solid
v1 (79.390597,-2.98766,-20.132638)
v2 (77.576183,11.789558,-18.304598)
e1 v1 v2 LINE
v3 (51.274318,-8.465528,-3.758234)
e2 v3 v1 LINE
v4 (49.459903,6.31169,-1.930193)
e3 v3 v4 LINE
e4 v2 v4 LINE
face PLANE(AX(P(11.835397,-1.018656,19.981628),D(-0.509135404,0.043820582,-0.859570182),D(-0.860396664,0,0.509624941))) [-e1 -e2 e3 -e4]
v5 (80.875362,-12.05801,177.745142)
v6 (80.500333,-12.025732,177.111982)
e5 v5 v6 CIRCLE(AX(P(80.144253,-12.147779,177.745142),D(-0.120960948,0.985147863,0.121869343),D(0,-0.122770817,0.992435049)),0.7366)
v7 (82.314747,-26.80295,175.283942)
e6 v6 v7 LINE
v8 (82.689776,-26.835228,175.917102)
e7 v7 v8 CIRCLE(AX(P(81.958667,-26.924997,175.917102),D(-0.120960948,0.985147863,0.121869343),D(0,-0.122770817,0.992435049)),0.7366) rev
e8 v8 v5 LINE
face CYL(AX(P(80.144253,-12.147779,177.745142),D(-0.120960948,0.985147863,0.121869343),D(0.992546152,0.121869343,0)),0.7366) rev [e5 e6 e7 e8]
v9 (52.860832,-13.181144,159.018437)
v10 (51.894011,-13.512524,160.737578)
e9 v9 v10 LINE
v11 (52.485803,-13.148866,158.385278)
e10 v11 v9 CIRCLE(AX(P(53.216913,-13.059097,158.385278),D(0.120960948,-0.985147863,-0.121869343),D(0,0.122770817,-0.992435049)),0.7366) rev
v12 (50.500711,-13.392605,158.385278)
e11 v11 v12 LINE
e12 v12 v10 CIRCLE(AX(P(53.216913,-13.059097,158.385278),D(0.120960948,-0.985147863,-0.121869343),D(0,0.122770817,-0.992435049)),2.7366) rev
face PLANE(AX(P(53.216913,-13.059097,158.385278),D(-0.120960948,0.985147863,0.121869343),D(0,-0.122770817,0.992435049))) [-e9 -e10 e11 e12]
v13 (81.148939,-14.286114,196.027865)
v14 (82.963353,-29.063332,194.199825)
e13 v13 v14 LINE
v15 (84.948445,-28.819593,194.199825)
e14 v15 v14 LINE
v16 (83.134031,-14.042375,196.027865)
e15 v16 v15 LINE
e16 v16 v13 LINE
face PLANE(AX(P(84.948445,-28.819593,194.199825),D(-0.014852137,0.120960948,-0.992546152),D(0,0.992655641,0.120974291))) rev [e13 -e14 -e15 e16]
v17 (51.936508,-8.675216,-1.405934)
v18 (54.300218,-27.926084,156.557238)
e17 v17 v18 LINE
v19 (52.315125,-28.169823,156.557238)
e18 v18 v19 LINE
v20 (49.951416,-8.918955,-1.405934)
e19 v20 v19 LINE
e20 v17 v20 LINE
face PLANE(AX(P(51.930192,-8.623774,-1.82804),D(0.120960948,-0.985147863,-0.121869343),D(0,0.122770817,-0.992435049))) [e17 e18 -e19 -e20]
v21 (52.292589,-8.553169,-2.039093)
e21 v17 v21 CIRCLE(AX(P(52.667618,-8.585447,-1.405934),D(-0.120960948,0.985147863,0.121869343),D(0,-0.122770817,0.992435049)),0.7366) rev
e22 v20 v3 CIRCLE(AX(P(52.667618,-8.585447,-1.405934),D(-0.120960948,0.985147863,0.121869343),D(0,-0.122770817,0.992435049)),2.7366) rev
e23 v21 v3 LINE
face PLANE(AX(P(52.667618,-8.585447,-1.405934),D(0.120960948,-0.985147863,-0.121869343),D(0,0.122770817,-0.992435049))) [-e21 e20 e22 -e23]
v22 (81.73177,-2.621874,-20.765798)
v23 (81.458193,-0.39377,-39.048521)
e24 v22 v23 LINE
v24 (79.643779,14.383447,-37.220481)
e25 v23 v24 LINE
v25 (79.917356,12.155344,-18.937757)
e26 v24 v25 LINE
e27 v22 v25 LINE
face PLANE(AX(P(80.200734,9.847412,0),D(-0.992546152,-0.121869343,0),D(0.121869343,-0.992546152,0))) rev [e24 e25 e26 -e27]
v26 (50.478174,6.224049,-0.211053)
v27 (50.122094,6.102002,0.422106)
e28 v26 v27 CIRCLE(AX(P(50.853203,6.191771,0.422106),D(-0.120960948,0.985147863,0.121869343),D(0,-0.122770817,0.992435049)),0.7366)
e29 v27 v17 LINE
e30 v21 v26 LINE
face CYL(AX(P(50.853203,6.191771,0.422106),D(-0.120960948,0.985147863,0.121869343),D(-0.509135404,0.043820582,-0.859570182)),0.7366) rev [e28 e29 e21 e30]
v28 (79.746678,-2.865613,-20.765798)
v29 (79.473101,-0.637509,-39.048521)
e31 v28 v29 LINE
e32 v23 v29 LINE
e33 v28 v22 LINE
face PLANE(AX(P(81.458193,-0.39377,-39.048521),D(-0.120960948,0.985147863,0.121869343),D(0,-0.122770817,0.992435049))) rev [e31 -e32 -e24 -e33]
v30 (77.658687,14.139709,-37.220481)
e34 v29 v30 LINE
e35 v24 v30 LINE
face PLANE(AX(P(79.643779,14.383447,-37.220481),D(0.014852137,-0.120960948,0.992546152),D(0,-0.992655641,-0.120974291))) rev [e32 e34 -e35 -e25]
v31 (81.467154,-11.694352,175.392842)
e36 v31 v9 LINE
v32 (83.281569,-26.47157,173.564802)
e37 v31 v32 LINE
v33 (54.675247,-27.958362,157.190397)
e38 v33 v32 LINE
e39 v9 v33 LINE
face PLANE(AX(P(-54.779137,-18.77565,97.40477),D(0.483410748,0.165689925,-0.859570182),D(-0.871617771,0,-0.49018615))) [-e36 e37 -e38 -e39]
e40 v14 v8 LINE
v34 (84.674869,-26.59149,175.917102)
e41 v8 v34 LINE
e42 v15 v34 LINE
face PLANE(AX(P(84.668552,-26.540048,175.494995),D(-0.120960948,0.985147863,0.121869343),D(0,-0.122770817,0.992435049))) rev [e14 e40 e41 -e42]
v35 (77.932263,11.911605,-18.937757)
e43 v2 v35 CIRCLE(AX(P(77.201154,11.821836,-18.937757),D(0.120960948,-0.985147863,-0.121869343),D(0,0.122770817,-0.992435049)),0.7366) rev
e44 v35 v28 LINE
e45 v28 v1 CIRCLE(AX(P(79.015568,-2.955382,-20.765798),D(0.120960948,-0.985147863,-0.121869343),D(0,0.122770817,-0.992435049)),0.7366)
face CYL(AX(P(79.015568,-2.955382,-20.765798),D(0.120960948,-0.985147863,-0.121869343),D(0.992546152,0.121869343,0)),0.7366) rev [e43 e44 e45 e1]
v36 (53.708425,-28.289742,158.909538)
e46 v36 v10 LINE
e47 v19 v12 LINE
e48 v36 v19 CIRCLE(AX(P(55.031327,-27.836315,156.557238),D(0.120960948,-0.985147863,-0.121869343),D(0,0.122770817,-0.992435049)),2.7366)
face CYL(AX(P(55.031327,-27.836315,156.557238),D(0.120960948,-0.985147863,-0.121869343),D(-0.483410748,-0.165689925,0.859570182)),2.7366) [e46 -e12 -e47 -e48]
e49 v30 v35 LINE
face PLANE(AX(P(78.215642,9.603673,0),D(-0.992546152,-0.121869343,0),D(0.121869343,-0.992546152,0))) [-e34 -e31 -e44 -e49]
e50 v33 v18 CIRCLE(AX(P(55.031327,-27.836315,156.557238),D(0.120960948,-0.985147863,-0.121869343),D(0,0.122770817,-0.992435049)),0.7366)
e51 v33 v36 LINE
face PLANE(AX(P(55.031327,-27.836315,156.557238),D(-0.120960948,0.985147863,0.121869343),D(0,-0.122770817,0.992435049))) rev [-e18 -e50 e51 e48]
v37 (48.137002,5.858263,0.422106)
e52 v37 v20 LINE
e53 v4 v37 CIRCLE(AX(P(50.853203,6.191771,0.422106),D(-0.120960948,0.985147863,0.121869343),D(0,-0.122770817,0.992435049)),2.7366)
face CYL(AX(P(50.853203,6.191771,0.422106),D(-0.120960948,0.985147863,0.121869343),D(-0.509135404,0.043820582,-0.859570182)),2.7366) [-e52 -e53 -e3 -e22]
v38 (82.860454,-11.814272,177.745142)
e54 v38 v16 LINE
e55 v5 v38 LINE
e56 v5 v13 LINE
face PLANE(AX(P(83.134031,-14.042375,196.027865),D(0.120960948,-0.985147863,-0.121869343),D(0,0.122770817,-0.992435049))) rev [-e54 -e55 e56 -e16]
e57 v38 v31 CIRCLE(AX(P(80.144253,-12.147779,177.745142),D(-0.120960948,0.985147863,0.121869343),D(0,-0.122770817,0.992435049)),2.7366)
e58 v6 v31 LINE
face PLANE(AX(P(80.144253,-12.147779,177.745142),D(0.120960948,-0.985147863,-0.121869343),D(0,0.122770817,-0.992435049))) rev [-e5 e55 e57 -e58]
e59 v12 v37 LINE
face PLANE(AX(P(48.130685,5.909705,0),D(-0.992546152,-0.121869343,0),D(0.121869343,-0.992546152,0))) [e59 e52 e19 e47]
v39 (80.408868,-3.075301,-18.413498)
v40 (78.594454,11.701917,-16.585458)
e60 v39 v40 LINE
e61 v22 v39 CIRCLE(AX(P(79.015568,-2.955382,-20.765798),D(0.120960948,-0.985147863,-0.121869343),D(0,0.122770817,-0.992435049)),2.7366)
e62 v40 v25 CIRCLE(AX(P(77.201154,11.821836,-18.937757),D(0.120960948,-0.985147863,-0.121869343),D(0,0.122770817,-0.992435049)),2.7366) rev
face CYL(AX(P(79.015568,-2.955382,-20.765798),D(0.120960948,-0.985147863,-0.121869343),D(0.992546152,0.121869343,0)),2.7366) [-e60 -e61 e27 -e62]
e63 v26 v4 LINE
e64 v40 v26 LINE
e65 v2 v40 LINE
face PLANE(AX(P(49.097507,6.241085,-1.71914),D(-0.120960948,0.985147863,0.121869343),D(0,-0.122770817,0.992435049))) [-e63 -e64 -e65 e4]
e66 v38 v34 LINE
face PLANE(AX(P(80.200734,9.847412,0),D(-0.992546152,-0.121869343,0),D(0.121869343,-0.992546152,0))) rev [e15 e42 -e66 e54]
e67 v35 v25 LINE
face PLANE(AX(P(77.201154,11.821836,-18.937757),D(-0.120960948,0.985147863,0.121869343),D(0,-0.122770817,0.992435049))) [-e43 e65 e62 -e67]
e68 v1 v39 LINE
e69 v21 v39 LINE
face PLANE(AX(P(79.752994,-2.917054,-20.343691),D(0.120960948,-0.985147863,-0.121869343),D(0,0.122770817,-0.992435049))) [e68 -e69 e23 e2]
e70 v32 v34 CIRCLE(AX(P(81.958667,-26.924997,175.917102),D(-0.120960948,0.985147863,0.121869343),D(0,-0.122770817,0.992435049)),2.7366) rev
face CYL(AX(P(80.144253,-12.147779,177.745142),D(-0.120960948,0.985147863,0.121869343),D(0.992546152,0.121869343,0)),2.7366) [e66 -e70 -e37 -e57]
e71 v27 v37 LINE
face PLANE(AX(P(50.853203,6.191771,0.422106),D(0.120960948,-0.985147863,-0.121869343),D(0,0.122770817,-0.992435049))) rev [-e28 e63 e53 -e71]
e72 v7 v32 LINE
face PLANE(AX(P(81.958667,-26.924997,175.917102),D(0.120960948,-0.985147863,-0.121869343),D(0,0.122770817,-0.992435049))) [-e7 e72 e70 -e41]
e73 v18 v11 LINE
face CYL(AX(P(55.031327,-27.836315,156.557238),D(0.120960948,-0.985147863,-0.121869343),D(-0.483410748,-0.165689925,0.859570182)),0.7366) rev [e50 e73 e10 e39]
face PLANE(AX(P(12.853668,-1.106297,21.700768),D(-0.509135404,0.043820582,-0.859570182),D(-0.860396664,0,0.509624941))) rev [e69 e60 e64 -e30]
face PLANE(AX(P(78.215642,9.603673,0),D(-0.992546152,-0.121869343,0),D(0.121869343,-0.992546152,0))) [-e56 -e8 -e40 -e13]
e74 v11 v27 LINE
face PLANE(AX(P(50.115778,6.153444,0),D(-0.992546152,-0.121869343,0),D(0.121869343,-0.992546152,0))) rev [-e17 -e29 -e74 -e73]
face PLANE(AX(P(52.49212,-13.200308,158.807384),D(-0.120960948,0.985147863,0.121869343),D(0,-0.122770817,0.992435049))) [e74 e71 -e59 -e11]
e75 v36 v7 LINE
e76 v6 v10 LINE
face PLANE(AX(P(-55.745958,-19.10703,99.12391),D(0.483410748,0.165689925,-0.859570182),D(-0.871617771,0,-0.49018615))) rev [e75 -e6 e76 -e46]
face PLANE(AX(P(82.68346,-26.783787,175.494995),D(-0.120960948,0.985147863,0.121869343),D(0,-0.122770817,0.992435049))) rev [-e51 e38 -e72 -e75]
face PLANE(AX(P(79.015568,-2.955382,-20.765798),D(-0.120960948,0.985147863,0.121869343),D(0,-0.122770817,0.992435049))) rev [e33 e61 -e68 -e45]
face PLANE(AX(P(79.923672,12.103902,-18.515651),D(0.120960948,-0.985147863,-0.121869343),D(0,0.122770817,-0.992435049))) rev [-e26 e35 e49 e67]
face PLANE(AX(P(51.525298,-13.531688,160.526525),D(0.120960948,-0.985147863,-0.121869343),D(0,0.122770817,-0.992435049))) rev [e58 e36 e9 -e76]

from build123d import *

# Parameters (mm, degrees)
SKETCH2_W                    = 160
SKETCH2_H                    = 15
BASE_FLANGE1_DEPTH           = 2
EDGE_FLANGE1_STRIP_CUT_DEPTH = 15
EDGE_FLANGE1_DEPTH           = 15
EDGE_FLANGE2_STRIP_CUT_DEPTH = 15
EDGE_FLANGE2_DEPTH           = 15
EDGE_FLANGE3_STRIP_CUT_DEPTH = 15
EDGE_FLANGE3_DEPTH           = 15
EDGE_FLANGE4_STRIP_CUT_DEPTH = 15
EDGE_FLANGE4_DEPTH           = 15


# Sheet-metal steps are written as plain solids
with BuildPart() as part:
    # Sketch2 → Base-Flange1 (new body)
    with BuildSketch(Plane(origin=(48.130685362, 5.909705068, 0), x_dir=(0.014852136862004454, -0.1209609477998444, 0.9925461516413208), z_dir=(-0.9925461516413208, -0.12186934340515826, 0))):
        with Locations((80, -7.5)):
            Rectangle(SKETCH2_W, SKETCH2_H)
    extrude(amount=-BASE_FLANGE1_DEPTH)

    # Edge-Flange1 strip (across the edge) → Edge-Flange1 strip cut (cut)
    with BuildSketch(Plane(origin=(51.930191883, -8.623774192, -1.828040151), x_dir=(0.5091354036436435, -0.04382058195792874, 0.8595701817498632), z_dir=(-0.1209609477998443, 0.9851478631379957, 0.1218693434051582))):
        Polygon((-8.835731855, 2.791911088), (-0.6317, -1.944688912), (0.3683, -0.212638104), (-7.835731855, 4.523961896), align=None)
    extrude(amount=EDGE_FLANGE1_STRIP_CUT_DEPTH, mode=Mode.SUBTRACT)

    # Edge-Flange1 section (across the edge) → Edge-Flange1 (add)
    with BuildSketch(Plane(origin=(51.930191883, -8.623774192, -1.828040151), x_dir=(0.5091354036436435, -0.04382058195792874, 0.8595701817498632), z_dir=(-0.1209609477998443, 0.9851478631379957, 0.1218693434051582))):
        with BuildLine():
            Line((-2, 0.425276208), (-2, 33.845299462))
            Line((-2, 33.845299462), (0, 33.845299462))
            Line((0, 33.845299462), (0, 0.425276208))
            ThreePointArc((0, 0.425276208), (0.098685688, 0.056976208), (0.3683, -0.212638104))
            Line((0.3683, -0.212638104), (-0.6317, -1.944688912))
            ThreePointArc((-0.6317, -1.944688912), (-1.63336512, -0.943023792), (-2, 0.425276208))
        make_face()
    extrude(amount=EDGE_FLANGE1_DEPTH)

    # Edge-Flange2 strip (across the edge) → Edge-Flange2 strip cut (cut)
    with BuildSketch(Plane(origin=(77.938579558, 11.860163483, -18.515651229), x_dir=(-0.9925461516413208, -0.12186934340515852, 0), z_dir=(0.12096094779984468, -0.9851478631379958, -0.12186934340515816))):
        Polygon((-8.835731855, 2.791911088), (-0.6317, -1.944688912), (0.3683, -0.212638104), (-7.835731855, 4.523961896), align=None)
    extrude(amount=EDGE_FLANGE2_STRIP_CUT_DEPTH, mode=Mode.SUBTRACT)

    # Edge-Flange2 section (across the edge) → Edge-Flange2 (add)
    with BuildSketch(Plane(origin=(77.938579558, 11.860163483, -18.515651229), x_dir=(-0.9925461516413208, -0.12186934340515852, 0), z_dir=(0.12096094779984468, -0.9851478631379958, -0.12186934340515816))):
        with BuildLine():
            Line((-2, 0.425276208), (-2, 18.845299462))
            Line((-2, 18.845299462), (0, 18.845299462))
            Line((0, 18.845299462), (0, 0.425276208))
            ThreePointArc((0, 0.425276208), (0.098685688, 0.056976208), (0.3683, -0.212638104))
            Line((0.3683, -0.212638104), (-0.6317, -1.944688912))
            ThreePointArc((-0.6317, -1.944688912), (-1.63336512, -0.943023792), (-2, 0.425276208))
        make_face()
    extrude(amount=EDGE_FLANGE2_DEPTH)

    # Edge-Flange3 strip (across the edge) → Edge-Flange3 strip cut (cut)
    with BuildSketch(Plane(origin=(52.492119564, -13.200307893, 158.807384263), x_dir=(0.48341074799768535, 0.16568992536308802, -0.8595701817498632), z_dir=(0.12096094779984425, -0.9851478631379958, -0.1218693434051584))):
        Polygon((-8.835731855, 2.791911088), (-0.6317, -1.944688912), (0.3683, -0.212638104), (-7.835731855, 4.523961896), align=None)
    extrude(amount=EDGE_FLANGE3_STRIP_CUT_DEPTH, mode=Mode.SUBTRACT)

    # Edge-Flange3 section (across the edge) → Edge-Flange3 (add)
    with BuildSketch(Plane(origin=(52.492119564, -13.200307893, 158.807384263), x_dir=(0.48341074799768535, 0.16568992536308802, -0.8595701817498632), z_dir=(0.12096094779984425, -0.9851478631379958, -0.1218693434051584))):
        with BuildLine():
            Line((-2, 0.425276208), (-2, 33.845299462))
            Line((-2, 33.845299462), (0, 33.845299462))
            Line((0, 33.845299462), (0, 0.425276208))
            ThreePointArc((0, 0.425276208), (0.098685688, 0.056976208), (0.3683, -0.212638104))
            Line((0.3683, -0.212638104), (-0.6317, -1.944688912))
            ThreePointArc((-0.6317, -1.944688912), (-1.63336512, -0.943023792), (-2, 0.425276208))
        make_face()
    extrude(amount=EDGE_FLANGE3_DEPTH)

    # Edge-Flange4 strip (across the edge) → Edge-Flange4 strip cut (cut)
    with BuildSketch(Plane(origin=(82.683460004, -26.783786628, 175.494995341), x_dir=(-0.9925461516413208, -0.12186934340515758, 0), z_dir=(-0.12096094779984379, 0.9851478631379957, 0.12186934340515838))):
        Polygon((-8.835731855, 2.791911088), (-0.6317, -1.944688912), (0.3683, -0.212638104), (-7.835731855, 4.523961896), align=None)
    extrude(amount=EDGE_FLANGE4_STRIP_CUT_DEPTH, mode=Mode.SUBTRACT)

    # Edge-Flange4 section (across the edge) → Edge-Flange4 (add)
    with BuildSketch(Plane(origin=(82.683460004, -26.783786628, 175.494995341), x_dir=(-0.9925461516413208, -0.12186934340515758, 0), z_dir=(-0.12096094779984379, 0.9851478631379957, 0.12186934340515838))):
        with BuildLine():
            Line((-2, 0.425276208), (-2, 18.845299462))
            Line((-2, 18.845299462), (0, 18.845299462))
            Line((0, 18.845299462), (0, 0.425276208))
            ThreePointArc((0, 0.425276208), (0.098685688, 0.056976208), (0.3683, -0.212638104))
            Line((0.3683, -0.212638104), (-0.6317, -1.944688912))
            ThreePointArc((-0.6317, -1.944688912), (-1.63336512, -0.943023792), (-2, 0.425276208))
        make_face()
    extrude(amount=EDGE_FLANGE4_DEPTH)


solid = part.part
